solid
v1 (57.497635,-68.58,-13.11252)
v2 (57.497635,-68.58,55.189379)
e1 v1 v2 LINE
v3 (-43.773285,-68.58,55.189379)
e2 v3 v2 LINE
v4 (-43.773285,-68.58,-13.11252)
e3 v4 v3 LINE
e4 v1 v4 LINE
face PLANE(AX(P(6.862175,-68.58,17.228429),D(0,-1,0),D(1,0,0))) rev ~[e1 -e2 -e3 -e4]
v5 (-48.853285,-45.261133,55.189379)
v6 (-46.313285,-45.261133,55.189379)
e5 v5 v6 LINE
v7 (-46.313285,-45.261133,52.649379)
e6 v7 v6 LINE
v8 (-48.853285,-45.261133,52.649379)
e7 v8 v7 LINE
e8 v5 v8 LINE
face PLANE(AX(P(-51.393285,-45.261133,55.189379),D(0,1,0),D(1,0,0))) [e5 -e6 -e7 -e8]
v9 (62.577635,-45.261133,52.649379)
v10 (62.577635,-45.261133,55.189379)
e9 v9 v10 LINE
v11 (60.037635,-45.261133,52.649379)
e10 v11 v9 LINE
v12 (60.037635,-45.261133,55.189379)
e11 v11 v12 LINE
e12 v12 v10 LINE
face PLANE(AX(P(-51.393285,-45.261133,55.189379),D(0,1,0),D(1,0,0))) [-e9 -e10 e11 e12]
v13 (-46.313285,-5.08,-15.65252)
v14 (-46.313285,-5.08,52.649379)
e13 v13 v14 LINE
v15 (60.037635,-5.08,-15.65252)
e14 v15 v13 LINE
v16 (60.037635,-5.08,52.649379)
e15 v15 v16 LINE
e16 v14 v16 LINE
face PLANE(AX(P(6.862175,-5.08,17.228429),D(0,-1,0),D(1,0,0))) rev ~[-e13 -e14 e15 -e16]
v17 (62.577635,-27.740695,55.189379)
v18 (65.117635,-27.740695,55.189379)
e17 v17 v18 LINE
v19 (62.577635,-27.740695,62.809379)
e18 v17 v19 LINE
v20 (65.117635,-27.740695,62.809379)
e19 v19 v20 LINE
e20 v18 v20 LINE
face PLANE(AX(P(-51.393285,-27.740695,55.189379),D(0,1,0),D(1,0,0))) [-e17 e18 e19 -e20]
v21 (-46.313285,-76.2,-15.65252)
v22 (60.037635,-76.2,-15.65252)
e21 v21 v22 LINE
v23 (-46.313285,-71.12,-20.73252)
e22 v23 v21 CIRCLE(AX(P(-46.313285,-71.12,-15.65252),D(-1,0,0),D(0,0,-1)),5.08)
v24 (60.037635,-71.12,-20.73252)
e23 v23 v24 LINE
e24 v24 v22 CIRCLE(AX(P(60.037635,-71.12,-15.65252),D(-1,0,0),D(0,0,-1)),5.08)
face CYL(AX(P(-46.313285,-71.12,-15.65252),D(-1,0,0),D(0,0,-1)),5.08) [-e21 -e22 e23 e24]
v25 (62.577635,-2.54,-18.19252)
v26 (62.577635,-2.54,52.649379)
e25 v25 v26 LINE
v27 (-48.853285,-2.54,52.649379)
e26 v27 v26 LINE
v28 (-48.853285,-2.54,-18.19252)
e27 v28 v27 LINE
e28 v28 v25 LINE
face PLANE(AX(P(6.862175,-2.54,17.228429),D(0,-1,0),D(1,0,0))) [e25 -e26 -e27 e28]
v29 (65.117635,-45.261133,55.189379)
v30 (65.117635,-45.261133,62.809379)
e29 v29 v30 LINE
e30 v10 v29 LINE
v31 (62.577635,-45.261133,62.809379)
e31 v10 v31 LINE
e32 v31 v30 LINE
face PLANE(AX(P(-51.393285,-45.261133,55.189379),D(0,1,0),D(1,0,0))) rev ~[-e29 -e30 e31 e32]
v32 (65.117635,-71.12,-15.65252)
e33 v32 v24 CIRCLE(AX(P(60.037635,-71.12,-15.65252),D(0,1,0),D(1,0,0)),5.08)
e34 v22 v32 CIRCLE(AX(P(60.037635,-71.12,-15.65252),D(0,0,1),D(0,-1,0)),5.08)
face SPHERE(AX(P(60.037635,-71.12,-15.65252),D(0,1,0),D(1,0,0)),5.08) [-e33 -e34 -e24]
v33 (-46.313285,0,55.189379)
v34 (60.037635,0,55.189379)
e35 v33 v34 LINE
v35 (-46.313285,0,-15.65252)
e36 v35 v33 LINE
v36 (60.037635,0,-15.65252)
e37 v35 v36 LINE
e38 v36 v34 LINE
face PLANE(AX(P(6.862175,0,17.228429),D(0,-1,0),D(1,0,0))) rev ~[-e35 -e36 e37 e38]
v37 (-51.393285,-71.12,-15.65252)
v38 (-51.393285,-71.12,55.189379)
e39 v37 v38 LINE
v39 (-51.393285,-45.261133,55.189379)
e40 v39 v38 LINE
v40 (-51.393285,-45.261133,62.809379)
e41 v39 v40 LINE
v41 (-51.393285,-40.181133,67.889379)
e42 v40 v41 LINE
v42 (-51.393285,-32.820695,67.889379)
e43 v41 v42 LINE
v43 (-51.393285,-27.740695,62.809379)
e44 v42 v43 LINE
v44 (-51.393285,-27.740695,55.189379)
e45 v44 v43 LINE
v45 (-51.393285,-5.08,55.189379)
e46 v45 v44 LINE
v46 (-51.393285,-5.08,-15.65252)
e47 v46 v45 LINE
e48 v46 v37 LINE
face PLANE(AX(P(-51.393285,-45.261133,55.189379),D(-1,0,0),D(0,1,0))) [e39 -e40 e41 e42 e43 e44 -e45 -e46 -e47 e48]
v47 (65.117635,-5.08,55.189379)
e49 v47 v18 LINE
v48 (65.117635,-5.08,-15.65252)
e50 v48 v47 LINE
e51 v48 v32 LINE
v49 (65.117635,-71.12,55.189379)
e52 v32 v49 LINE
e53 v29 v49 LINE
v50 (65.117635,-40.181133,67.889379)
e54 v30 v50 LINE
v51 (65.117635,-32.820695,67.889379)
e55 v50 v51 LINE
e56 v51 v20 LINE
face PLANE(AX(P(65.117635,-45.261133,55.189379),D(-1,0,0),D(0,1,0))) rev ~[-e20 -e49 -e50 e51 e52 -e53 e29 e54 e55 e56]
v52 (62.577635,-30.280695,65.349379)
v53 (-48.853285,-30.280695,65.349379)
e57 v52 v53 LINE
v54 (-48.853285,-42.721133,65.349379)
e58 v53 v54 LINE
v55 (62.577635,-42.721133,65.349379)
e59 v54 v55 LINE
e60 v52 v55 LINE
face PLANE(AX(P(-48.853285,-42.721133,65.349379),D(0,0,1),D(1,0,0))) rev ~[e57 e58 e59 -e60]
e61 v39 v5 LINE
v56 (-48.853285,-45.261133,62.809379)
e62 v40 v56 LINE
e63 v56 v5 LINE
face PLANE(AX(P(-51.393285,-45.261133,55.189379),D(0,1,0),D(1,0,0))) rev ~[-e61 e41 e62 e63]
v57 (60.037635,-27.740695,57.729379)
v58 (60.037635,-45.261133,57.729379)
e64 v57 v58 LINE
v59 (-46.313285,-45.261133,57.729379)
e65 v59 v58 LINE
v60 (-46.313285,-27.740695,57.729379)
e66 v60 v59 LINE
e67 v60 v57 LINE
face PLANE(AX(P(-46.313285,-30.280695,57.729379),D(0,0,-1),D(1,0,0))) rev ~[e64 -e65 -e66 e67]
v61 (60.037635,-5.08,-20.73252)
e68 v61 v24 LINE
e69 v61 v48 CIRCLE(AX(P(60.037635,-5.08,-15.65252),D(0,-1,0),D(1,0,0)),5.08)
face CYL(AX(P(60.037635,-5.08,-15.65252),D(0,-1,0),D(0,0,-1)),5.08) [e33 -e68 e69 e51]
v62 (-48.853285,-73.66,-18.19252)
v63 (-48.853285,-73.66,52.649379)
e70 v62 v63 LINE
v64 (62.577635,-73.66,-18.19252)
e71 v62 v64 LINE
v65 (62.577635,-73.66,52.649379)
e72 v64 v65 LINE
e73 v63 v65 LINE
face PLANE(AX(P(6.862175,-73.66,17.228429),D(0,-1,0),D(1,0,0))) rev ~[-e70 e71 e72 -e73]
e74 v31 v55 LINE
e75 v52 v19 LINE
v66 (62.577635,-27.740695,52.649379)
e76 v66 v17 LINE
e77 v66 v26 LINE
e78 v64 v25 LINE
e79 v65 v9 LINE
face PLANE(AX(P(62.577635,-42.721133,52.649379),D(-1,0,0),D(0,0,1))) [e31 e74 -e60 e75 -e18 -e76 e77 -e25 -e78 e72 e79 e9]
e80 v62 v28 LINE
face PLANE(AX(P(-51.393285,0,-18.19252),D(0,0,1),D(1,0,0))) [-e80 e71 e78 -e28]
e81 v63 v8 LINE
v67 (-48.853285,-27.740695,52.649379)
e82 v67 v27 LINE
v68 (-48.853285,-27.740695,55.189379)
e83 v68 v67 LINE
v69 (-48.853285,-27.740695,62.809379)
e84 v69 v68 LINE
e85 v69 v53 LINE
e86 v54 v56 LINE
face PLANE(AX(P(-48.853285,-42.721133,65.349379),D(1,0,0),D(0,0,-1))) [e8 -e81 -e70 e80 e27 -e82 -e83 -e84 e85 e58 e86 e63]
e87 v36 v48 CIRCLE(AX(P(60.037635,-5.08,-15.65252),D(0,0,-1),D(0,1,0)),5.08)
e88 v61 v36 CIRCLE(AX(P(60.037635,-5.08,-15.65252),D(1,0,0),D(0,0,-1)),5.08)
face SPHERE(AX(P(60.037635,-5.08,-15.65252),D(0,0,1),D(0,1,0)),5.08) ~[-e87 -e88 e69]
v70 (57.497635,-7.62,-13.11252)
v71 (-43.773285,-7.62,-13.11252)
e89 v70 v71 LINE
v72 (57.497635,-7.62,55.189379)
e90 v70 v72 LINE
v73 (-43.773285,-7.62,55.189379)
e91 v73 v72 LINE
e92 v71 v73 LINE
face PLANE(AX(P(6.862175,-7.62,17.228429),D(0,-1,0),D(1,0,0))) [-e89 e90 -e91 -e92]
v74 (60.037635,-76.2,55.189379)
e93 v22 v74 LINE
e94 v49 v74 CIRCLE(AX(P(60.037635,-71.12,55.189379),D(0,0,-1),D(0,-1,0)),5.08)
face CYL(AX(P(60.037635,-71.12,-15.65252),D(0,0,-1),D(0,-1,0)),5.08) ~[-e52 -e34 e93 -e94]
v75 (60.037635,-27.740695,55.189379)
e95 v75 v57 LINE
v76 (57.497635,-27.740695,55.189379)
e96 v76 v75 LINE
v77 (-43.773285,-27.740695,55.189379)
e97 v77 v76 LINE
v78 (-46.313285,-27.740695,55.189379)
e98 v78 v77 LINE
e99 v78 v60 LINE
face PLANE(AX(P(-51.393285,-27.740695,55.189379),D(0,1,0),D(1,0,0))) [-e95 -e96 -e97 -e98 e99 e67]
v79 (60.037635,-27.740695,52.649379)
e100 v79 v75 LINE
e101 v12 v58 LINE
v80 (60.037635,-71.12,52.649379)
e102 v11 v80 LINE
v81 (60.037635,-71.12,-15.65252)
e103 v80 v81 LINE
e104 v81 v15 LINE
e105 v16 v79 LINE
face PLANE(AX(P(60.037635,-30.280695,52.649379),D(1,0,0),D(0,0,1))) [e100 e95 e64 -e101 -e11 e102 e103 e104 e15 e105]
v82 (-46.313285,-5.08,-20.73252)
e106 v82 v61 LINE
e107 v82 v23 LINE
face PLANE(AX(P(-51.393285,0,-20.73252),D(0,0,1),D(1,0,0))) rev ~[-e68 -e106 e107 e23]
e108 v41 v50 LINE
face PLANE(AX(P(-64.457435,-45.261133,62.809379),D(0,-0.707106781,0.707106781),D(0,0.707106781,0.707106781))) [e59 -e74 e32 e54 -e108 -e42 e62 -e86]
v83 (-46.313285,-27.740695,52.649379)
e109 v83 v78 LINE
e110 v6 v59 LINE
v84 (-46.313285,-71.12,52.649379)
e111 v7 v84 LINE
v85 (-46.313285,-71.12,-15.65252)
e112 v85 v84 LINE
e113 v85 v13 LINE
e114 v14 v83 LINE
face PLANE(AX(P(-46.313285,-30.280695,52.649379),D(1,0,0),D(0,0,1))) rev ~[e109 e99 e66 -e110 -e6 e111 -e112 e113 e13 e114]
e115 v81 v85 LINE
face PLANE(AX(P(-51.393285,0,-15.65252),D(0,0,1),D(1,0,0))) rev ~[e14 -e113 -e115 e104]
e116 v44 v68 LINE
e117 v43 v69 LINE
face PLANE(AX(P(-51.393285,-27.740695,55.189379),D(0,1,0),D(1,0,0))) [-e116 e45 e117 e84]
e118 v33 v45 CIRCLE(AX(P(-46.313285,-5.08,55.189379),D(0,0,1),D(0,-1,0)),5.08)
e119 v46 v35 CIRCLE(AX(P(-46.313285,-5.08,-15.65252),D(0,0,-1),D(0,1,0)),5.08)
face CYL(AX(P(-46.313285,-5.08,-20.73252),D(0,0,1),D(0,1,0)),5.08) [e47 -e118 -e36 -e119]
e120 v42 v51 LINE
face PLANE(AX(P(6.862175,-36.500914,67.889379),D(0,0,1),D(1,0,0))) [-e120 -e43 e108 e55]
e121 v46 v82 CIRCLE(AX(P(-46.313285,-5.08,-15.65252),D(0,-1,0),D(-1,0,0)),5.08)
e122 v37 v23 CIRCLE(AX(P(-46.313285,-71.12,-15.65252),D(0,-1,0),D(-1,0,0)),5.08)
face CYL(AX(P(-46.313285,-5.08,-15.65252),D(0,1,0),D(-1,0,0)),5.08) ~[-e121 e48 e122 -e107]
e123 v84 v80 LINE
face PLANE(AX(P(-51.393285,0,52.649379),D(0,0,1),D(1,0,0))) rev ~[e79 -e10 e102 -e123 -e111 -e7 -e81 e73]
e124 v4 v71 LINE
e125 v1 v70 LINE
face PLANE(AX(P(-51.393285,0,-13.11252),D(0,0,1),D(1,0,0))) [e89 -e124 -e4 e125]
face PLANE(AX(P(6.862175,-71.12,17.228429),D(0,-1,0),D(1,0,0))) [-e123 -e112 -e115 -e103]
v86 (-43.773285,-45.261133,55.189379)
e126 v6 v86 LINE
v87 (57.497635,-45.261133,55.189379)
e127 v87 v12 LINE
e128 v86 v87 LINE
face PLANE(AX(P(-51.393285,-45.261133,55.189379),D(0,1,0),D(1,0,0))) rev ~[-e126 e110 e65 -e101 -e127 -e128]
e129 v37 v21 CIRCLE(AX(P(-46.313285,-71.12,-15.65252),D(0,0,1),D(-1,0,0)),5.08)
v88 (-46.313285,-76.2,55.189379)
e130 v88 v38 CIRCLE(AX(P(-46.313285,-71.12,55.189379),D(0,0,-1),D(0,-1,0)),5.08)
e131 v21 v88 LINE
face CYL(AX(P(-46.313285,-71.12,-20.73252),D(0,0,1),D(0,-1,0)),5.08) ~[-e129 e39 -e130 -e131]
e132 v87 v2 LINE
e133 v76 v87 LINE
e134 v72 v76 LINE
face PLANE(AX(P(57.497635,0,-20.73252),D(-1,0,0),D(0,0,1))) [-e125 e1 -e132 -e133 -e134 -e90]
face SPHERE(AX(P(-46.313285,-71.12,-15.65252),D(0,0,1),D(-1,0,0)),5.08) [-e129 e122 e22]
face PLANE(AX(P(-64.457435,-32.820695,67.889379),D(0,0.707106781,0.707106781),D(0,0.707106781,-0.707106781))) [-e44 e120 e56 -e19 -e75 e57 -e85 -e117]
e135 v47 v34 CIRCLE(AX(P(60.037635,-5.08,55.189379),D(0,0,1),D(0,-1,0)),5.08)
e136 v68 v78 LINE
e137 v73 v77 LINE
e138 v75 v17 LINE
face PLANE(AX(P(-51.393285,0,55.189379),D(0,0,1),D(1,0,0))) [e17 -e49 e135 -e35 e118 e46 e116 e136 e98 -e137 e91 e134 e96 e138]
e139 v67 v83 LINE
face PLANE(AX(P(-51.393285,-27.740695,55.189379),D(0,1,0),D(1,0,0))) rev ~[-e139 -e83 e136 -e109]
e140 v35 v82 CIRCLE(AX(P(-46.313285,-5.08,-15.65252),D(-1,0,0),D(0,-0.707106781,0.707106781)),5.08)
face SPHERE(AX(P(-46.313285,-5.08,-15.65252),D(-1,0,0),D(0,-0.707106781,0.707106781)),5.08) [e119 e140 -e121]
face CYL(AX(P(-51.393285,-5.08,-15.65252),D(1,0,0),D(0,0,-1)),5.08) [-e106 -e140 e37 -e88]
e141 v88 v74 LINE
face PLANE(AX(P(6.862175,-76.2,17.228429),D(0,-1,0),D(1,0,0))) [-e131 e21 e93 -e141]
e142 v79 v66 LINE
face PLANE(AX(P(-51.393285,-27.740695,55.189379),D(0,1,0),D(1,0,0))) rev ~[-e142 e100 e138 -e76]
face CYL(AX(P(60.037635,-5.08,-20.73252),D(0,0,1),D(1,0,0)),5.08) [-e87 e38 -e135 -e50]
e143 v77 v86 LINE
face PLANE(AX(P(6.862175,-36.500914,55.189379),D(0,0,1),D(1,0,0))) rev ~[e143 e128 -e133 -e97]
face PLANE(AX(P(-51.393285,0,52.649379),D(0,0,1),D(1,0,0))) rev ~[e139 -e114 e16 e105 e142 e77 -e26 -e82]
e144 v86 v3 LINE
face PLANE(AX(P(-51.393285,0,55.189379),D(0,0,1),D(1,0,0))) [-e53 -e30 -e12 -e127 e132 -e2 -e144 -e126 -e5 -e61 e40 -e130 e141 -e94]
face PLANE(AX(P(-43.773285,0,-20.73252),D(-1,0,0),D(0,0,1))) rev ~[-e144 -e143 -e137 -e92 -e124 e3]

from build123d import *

# Parameters (mm, degrees)
F0_W         = 116.5109202266
F0_H         = 75.9218987077
F1_DEPTH     = 76.2
F2_T         = -7.62
F3_W         = 116.5109202266
F3_H         = 17.5204388797
F4_DEPTH     = 12.7
F5_T         = -2.54
F6_R         = 5.08
F7_R         = 5.08
F8_R         = 5.08
F9_T1_DEPTH  = 66.04
F9_T3_DEPTH  = 106.3509202266
F9_T5_DEPTH  = 83.5418987077
F9_S9_W      = 5.08
F9_S9_H      = 5.08
F9_T10_DEPTH = 5.08
F9_T14_ANGLE = 90
F9_T16_ANGLE = 90
F10_T1_DEPTH = 142.6392193843
F11_T1_DEPTH = 142.6392193843


# Not quite as in the source:
# - a fillet or chamfer that OpenCascade refuses, or shapes differently, is made with other operations: its cross-section is extruded or revolved along the edge and cut away or added
# - a shell that OpenCascade refuses in one call is made with other operations: the cavity is built on its own and cut out


with BuildPart() as f1:
    # F0 (on Front) → F1 (new body)
    with BuildSketch(Plane.XZ):
        with Locations((6.8621747196, 17.2284292057)):
            Rectangle(F0_W, F0_H)
    extrude(amount=F1_DEPTH)

    # F2
    f2_openings = [f1.faces().sort_by_distance(p)[0] for p in [
        (6.862175, -38.1, 55.189379),
    ]]
    offset(amount=F2_T, openings=f2_openings)

    # F3 (on face) → F4 (join)
    with BuildSketch(Plane.XY.offset(55.1893785596)):
        with Locations((6.8621747196, -36.5009140223)):
            Rectangle(F3_W, F3_H)
    extrude(amount=F4_DEPTH)

    # F5: a shell. OpenCascade refuses it in one call, so the cavity is built on its own and cut out:
    # the body offset inwards by the wall thickness, plus a prism from it out through each open face.
    f5_core = offset(f1.part, amount=F5_T, kind=Kind.INTERSECTION, mode=Mode.PRIVATE)
    f5_exits = [f5_core.faces().sort_by_distance(p)[0] for p in [
        (6.862175, -42.721133, 61.352079),
        (6.862175, -30.280695, 61.352079),
    ]]
    add(f5_core, mode=Mode.SUBTRACT)
    extrude(f5_exits, amount=-F5_T, mode=Mode.SUBTRACT)

    # F6
    f6_edges = [f1.edges().sort_by_distance(p)[0] for p in [
        (65.117635, 0, 17.228429),
    ]]
    fillet(f6_edges, radius=F6_R)

    # F7
    f7_edges = [f1.edges().sort_by_distance(p)[0] for p in [
        (4.322175, 0, -20.73252),
        (-51.393285, 0, 17.228429),
    ]]
    fillet(f7_edges, radius=F7_R)

    # F8
    f8_edges = [f1.edges().sort_by_distance(p)[0] for p in [
        (-51.393285, -76.2, 17.228429),
    ]]
    fillet(f8_edges, radius=F8_R)

    # F9: fillet of radius 5.08 on 1 edges, made by hand

    # F9_s2 → F9_t1 (cut)
    with BuildSketch(Plane.XZ.offset(5.08)):
        with BuildLine():
            ThreePointArc((-51.3932853937, -15.6525201482), (-49.9053878421, -19.2446225966), (-46.3132853937, -20.7325201482))
            Line((-46.3132853937, -20.7325201482), (-51.3932853937, -20.7325201482))
            Line((-51.3932853937, -20.7325201482), (-51.3932853937, -15.6525201482))
        make_face()
    extrude(amount=F9_T1_DEPTH, mode=Mode.SUBTRACT)

    # F9_s4 → F9_t3 (cut)
    with BuildSketch(Plane.YZ.offset(-46.3132853937)):
        with BuildLine():
            ThreePointArc((-71.12, -20.7325201482), (-74.7121024484, -19.2446225966), (-76.2, -15.6525201482))
            Line((-76.2, -15.6525201482), (-76.2, -20.7325201482))
            Line((-76.2, -20.7325201482), (-71.12, -20.7325201482))
        make_face()
    extrude(amount=F9_T3_DEPTH, mode=Mode.SUBTRACT)

    # F9_s6 → F9_t5 (cut)
    with BuildSketch(Plane.XY.offset(-15.6525201482)):
        with BuildLine():
            ThreePointArc((60.0376348329, -76.2), (63.6297372813, -74.7121024484), (65.1176348329, -71.12))
            Line((65.1176348329, -71.12), (65.1176348329, -76.2))
            Line((65.1176348329, -76.2), (60.0376348329, -76.2))
        make_face()
    extrude(amount=F9_T5_DEPTH, mode=Mode.SUBTRACT)


with BuildPart() as f9_tool8:
    # F9_s9 → F9_t10 (new body)
    with BuildSketch(Plane.YZ.offset(-46.3132853937)):
        with Locations((-2.54, -18.1925201482)):
            Rectangle(F9_S9_W, F9_S9_H)
    extrude(amount=-F9_T10_DEPTH)

    # F9_s11 → F9_t12 (revolve, cut)
    with BuildSketch(Plane(origin=(-46.3132853937, -5.08, -15.6525201482), x_dir=(0, -0.7071067812, 0.7071067812), z_dir=(0, -0.7071067812, -0.7071067812))):
        with BuildLine():
            ThreePointArc((0, -5.08), (5.08, 0), (0, 5.08))
            Line((0, 5.08), (0, -5.08))
        make_face()
    revolve(axis=Axis((-46.3132853937, -5.08, -15.6525201482), (-1, 0, 0)), mode=Mode.SUBTRACT)


with BuildPart() as f1_1:
    add(f1.part)

    # F9_t7: cut F9_tool8
    add(f9_tool8.part, mode=Mode.SUBTRACT)

    # F9_s13 → F9_t14 (revolve, cut)
    with BuildSketch(Plane.XZ.offset(71.12)):
        with BuildLine():
            ThreePointArc((-46.3132853937, -20.7325201482), (-49.9053878421, -19.2446225966), (-51.3932853937, -15.6525201482))
            Line((-51.3932853937, -15.6525201482), (-51.3932853937, -20.7325201482))
            Line((-51.3932853937, -20.7325201482), (-46.3132853937, -20.7325201482))
        make_face()
    revolve(axis=Axis((-46.3132853937, -71.12, -20.7325201482), (0, 0, 1)), revolution_arc=F9_T14_ANGLE, mode=Mode.SUBTRACT)

    # F9_s15 → F9_t16 (revolve, cut)
    with BuildSketch(Plane.XY.offset(-15.6525201482)):
        with BuildLine():
            ThreePointArc((60.0376348329, -76.2), (63.6297372813, -74.7121024484), (65.1176348329, -71.12))
            Line((65.1176348329, -71.12), (65.1176348329, -76.2))
            Line((65.1176348329, -76.2), (60.0376348329, -76.2))
        make_face()
    revolve(axis=Axis((60.0376348329, -76.2, -15.6525201482), (0, 1, 0)), revolution_arc=F9_T16_ANGLE, mode=Mode.SUBTRACT)

    # F10: chamfer of 5.08 on 1 edges, made by hand

    # F10_s2 → F10_t1 (cut)
    with BuildSketch(Plane.YZ.offset(-64.4574349726)):
        Polygon((-45.2611334622, 62.8093785596), (-40.1811334622, 67.8893785596), (-45.2611334622, 67.8893785596), align=None)
    extrude(amount=F10_T1_DEPTH, mode=Mode.SUBTRACT)

    # F11: chamfer of 5.08 on 1 edges, made by hand

    # F11_s2 → F11_t1 (cut)
    with BuildSketch(Plane.YZ.offset(-64.4574349726)):
        Polygon((-32.8206945825, 67.8893785596), (-27.7406945825, 62.8093785596), (-27.7406945825, 67.8893785596), align=None)
    extrude(amount=F11_T1_DEPTH, mode=Mode.SUBTRACT)


solid = f1_1.part
